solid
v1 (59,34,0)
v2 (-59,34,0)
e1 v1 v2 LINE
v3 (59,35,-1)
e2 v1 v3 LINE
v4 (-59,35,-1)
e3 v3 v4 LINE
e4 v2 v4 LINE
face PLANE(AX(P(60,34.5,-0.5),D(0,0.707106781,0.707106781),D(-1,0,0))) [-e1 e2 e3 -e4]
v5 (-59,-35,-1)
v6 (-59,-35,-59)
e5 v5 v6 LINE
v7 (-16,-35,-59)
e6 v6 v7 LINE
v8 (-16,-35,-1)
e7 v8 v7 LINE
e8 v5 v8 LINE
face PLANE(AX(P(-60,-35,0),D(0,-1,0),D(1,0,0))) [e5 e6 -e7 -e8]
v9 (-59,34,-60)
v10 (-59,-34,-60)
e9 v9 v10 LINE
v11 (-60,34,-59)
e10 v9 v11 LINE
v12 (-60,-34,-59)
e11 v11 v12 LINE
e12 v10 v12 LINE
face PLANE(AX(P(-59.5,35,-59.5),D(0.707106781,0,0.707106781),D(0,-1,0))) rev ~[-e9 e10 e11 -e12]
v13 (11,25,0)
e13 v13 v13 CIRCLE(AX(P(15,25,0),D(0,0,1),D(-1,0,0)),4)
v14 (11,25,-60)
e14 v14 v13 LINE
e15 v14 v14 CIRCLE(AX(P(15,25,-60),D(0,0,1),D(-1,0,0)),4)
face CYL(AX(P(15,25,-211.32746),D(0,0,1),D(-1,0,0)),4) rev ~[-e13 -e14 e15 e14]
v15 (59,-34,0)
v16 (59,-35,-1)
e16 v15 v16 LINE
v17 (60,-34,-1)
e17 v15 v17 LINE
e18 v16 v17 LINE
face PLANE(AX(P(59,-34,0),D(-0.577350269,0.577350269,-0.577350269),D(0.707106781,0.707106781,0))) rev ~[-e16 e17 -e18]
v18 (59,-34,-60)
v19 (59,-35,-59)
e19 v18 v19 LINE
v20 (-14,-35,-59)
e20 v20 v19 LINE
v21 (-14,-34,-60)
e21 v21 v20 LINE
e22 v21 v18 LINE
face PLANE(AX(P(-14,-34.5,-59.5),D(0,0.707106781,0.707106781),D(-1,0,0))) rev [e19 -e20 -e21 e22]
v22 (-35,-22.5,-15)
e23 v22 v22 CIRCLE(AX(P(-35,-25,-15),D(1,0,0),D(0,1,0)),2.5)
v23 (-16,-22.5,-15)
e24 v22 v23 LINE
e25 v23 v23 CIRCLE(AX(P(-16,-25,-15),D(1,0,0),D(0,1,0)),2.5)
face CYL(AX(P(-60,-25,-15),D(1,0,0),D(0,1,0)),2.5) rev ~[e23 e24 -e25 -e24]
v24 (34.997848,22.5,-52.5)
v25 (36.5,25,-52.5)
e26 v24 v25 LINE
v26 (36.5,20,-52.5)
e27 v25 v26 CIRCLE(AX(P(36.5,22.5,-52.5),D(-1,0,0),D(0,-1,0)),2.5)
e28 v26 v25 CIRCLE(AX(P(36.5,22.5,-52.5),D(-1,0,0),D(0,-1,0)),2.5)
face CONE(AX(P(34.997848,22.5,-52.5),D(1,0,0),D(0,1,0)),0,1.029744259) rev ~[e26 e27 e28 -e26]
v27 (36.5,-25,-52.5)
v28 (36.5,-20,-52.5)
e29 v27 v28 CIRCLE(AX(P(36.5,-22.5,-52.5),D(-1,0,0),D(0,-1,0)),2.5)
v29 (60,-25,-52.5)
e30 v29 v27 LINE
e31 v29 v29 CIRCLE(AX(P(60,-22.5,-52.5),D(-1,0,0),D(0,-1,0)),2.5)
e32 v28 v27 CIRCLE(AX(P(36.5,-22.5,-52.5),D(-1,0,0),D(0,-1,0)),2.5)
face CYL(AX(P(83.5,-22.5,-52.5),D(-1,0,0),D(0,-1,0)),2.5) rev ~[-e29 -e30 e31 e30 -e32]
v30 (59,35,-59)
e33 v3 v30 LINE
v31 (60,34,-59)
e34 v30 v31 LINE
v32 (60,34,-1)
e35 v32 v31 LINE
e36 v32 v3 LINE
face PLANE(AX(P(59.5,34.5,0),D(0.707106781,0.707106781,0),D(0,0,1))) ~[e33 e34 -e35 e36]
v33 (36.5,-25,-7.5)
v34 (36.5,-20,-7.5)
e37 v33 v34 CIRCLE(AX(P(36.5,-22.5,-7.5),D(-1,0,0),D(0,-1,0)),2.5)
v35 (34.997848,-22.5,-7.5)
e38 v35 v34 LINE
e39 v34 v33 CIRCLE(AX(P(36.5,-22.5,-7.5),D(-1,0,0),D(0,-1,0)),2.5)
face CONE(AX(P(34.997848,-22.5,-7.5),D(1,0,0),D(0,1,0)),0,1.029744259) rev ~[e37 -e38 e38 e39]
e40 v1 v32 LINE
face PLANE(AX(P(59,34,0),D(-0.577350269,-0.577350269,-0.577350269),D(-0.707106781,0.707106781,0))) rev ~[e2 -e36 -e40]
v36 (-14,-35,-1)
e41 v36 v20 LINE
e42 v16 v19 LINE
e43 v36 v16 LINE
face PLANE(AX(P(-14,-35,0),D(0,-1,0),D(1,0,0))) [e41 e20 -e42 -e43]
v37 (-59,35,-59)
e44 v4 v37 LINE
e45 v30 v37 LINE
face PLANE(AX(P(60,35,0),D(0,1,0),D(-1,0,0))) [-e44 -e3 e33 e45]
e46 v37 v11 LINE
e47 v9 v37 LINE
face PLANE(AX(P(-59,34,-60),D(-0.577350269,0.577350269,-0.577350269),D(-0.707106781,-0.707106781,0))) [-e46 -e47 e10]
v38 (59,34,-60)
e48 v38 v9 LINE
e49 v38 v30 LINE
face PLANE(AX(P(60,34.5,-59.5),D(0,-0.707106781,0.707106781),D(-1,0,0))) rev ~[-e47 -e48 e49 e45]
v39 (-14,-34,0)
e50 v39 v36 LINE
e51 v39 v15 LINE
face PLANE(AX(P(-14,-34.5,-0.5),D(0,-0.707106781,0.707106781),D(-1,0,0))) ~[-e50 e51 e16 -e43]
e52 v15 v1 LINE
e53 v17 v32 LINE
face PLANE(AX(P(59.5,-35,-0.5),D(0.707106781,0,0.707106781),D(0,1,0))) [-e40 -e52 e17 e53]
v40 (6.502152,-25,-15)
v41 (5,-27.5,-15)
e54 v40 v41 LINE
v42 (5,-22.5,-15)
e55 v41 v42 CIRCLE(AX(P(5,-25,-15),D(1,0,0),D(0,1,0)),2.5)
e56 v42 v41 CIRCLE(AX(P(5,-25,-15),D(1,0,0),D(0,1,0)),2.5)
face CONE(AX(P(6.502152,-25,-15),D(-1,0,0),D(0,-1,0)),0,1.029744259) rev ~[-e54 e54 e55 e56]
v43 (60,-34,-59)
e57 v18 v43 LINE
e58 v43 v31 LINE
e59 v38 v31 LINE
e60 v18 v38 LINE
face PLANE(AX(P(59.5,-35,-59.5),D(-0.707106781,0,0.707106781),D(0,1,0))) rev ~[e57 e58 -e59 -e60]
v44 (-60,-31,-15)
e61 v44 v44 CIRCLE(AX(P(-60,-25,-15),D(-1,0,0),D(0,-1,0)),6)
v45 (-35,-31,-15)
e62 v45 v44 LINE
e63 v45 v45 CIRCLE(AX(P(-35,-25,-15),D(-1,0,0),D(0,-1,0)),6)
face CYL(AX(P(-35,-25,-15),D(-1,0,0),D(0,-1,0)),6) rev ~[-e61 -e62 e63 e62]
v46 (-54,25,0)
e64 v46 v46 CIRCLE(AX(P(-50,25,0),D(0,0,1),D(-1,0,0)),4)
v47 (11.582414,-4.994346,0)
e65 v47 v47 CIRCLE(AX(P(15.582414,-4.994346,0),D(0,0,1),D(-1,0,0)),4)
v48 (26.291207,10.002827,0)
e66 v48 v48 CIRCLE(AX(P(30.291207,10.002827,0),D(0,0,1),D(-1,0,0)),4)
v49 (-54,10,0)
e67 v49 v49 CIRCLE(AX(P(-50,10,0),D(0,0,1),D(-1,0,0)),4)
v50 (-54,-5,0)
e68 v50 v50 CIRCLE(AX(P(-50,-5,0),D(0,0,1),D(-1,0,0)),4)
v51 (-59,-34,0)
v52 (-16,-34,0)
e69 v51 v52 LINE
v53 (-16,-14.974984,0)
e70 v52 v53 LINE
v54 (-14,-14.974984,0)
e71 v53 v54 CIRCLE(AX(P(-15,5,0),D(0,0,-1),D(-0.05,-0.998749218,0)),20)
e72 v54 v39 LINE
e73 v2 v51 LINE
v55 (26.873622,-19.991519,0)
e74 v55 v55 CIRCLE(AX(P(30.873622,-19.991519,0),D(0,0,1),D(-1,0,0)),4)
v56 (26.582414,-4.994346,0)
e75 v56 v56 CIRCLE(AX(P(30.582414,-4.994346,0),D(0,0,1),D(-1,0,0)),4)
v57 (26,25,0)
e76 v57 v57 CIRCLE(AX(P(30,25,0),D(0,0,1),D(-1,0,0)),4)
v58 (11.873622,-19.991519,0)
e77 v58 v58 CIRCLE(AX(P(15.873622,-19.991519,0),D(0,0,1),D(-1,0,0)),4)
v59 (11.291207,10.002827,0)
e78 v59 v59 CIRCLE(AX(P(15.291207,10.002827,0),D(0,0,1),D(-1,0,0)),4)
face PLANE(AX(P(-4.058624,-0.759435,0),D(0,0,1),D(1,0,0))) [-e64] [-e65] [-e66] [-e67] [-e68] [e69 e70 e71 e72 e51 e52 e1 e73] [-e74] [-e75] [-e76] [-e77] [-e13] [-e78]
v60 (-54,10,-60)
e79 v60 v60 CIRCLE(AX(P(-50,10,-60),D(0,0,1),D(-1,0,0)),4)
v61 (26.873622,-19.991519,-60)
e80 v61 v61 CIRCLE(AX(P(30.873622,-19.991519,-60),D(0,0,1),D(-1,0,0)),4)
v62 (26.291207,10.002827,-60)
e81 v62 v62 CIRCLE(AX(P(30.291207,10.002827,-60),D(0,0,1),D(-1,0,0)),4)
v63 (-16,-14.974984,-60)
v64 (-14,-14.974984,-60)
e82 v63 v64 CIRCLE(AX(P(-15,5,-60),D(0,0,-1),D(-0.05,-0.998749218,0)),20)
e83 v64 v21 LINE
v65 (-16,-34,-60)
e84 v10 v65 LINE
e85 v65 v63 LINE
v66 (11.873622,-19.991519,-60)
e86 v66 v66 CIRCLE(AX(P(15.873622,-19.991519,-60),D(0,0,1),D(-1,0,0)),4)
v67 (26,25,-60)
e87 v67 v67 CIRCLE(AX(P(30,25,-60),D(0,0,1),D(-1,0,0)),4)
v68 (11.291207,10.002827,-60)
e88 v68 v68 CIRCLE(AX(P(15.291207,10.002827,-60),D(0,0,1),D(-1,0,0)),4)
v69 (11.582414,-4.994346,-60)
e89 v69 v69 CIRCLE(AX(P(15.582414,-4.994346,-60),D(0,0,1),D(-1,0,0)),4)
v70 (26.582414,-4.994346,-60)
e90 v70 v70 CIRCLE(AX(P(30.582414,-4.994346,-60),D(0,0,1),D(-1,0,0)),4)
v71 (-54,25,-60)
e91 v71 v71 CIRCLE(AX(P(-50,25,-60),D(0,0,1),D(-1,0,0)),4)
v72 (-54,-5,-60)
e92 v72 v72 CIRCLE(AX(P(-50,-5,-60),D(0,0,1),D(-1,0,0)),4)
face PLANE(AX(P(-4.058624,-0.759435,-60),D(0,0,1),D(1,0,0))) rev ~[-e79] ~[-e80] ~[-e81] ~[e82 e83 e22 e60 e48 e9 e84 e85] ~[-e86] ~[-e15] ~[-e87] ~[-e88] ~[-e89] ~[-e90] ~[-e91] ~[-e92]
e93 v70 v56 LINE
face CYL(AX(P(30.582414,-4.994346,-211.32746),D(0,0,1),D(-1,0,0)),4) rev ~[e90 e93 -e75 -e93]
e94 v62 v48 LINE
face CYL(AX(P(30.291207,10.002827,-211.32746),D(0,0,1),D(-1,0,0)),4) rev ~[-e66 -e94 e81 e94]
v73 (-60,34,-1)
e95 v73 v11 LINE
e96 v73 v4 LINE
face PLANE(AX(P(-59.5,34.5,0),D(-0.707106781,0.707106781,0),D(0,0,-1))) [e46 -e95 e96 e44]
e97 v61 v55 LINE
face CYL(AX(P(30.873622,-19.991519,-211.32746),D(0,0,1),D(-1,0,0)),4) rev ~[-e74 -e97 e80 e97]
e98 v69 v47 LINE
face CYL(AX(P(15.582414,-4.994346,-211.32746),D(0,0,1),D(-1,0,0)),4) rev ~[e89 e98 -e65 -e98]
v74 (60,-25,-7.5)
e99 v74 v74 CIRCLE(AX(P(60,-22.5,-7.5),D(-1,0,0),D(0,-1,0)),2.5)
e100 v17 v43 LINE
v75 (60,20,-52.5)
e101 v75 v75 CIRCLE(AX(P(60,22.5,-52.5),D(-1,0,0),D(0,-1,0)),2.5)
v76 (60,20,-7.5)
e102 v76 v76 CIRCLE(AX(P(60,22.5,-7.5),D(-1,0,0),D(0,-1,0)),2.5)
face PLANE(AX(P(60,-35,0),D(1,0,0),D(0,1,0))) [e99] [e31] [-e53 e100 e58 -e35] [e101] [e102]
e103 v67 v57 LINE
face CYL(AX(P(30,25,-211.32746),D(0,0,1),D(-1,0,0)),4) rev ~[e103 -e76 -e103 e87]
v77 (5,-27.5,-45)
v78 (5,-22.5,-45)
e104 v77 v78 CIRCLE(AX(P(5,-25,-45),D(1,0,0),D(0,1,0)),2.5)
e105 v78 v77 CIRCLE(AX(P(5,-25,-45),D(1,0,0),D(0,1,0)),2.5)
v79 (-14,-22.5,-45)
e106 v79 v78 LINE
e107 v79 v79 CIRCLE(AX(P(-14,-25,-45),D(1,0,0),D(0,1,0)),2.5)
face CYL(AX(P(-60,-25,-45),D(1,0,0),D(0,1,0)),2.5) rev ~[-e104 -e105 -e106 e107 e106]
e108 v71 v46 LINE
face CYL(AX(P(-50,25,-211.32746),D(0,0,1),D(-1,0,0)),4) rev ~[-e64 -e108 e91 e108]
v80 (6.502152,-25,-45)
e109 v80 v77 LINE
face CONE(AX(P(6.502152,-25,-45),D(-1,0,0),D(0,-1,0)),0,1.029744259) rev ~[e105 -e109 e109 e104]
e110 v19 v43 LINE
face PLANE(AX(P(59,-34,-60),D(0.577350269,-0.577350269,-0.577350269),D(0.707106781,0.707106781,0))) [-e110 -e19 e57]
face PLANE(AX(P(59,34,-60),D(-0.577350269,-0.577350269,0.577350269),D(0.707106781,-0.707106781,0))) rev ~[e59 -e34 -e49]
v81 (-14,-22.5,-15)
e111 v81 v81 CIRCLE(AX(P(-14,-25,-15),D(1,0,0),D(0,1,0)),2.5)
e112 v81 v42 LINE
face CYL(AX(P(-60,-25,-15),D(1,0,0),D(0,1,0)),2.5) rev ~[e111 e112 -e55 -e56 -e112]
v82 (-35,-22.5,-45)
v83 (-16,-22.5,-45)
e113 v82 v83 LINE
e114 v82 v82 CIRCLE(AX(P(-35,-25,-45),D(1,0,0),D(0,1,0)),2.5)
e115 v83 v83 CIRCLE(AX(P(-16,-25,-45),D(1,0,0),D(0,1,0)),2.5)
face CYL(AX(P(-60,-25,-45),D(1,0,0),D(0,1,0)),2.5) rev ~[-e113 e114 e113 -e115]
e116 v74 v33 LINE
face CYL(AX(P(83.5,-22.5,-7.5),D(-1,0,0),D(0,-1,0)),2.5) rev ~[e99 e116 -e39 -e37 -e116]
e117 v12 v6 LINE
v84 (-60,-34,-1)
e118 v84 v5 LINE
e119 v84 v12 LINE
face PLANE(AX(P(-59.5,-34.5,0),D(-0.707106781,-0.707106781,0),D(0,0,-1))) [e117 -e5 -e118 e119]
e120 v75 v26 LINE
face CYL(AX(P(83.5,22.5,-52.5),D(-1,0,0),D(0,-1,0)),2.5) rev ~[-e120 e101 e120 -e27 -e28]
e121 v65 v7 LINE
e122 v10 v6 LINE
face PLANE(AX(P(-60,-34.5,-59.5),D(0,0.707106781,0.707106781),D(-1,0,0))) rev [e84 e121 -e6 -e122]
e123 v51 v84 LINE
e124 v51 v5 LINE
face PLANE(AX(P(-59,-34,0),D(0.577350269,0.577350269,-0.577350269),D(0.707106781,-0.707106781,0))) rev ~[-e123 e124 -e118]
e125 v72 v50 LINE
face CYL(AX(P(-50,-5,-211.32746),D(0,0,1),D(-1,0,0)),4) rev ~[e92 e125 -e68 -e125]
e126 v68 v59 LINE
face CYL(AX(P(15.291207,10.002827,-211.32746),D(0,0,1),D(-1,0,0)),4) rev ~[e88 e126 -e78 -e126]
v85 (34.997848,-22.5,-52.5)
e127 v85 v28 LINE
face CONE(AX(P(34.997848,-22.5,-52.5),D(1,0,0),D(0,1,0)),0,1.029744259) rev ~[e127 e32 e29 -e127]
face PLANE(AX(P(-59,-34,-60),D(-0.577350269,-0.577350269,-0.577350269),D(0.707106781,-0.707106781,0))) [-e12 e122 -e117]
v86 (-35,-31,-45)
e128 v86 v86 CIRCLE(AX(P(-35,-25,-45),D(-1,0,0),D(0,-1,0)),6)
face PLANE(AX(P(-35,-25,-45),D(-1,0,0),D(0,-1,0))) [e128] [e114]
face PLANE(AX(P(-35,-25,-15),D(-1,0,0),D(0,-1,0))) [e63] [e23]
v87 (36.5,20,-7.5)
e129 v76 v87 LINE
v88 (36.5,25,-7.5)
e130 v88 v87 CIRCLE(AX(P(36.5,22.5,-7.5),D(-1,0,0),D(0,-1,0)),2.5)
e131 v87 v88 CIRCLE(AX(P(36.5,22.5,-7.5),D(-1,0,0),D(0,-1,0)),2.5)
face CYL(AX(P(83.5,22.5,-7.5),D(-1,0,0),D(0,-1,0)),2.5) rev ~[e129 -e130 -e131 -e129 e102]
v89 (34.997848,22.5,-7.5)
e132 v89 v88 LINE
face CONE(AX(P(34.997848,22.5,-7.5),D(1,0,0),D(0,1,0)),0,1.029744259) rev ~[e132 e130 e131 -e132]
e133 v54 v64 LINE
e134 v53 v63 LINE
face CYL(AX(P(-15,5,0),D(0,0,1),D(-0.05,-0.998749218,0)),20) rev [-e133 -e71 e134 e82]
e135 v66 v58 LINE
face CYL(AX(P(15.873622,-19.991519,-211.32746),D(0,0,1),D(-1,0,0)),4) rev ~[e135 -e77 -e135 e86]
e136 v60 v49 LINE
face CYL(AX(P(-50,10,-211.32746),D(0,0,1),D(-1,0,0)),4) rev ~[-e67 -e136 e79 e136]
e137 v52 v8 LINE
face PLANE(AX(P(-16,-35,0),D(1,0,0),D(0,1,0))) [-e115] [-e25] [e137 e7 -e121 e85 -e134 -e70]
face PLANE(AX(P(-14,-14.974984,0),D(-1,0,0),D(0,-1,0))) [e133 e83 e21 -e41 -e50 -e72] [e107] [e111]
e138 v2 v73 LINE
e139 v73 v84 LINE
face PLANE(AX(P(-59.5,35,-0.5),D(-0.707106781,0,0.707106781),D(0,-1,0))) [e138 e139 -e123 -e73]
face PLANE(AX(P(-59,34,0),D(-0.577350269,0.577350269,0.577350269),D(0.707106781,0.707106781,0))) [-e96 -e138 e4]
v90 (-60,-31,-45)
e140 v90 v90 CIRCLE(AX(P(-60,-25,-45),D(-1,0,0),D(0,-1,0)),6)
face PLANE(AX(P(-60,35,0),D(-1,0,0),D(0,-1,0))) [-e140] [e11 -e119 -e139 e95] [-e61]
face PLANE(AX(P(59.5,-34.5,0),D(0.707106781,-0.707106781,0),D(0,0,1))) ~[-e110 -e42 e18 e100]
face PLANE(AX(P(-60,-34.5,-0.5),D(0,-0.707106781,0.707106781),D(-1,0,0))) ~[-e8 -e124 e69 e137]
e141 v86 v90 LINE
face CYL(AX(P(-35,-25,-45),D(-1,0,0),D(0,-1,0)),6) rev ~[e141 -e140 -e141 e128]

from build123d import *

# Parameters (mm, degrees)
F1_DEPTH       = 60
F3_D           = 5
F3_DEPTH       = 65
F3_CBORE_D     = 12
F3_CBORE_DEPTH = 25
F3_TIP         = 1.5021515476
F4_SIZE        = 1
F6_D           = 5
F6_DEPTH       = 23.5
F6_TIP         = 1.5021515476
F9_D           = 8
F9_ON_F7_D     = 8


with BuildPart() as f1:
    # F0 (on Top) → F1 (new body)
    with BuildSketch(Plane.XY):
        with BuildLine():
            Line((60, 35), (-60, 35))
            Line((-60, 35), (-60, -35))
            Line((-60, -35), (-16, -35))
            Line((-16, -35), (-16, -14.9749843554))
            ThreePointArc((-16, -14.9749843554), (-15, 25), (-14, -14.9749843554))
            Line((-14, -14.9749843554), (-14, -35))
            Line((-14, -35), (60, -35))
            Line((60, -35), (60, 35))
        make_face()
    extrude(amount=-F1_DEPTH)

    # F3
    with Locations(Plane(origin=(-60, 0, 0), x_dir=(0, -1, 0), z_dir=(-1, 0, 0))):
        with Locations((25, -45), (25, -15)):
            CounterBoreHole(F3_D / 2, F3_CBORE_D / 2, F3_CBORE_DEPTH, depth=F3_DEPTH)
            with Locations((0, 0, -(F3_DEPTH + F3_TIP / 2))):  # 118° drill point
                Cone(0, F3_D / 2, F3_TIP, mode=Mode.SUBTRACT)

    # F4
    f4_edges = [f1.edges().sort_by_distance(p)[0] for p in [
        (-60, -35, -30),
        (-60, 35, -30),
        (60, -35, -30),
        (60, 35, -30),
        (0, 35, -60),
        (-60, 0, -60),
        (-38, -35, -60),
        (23, -35, -60),
        (60, 0, -60),
        (-60, 0, 0),
        (-38, -35, 0),
        (23, -35, 0),
        (60, 0, 0),
        (0, 35, 0),
    ]]
    chamfer(f4_edges, length=F4_SIZE)

    # F6
    with Locations(Plane.YZ.offset(60)):
        with Locations((-22.5, -7.5), (22.5, -7.5), (22.5, -52.5), (-22.5, -52.5)):
            Hole(F6_D / 2, depth=F6_DEPTH)
            with Locations((0, 0, -(F6_DEPTH + F6_TIP / 2))):  # 118° drill point
                Cone(0, F6_D / 2, F6_TIP, mode=Mode.SUBTRACT)

    # F9 (through all)
    with Locations(Plane(origin=(0, 0, -60), x_dir=(1, 0, 0), z_dir=(0, 0, -1))):
        with Locations((15, -25), (15.2912072429, -10.0028269883), (15.5824144859, 4.9943460233), (15.8736217288, 19.991519035), (30.8736217288, 19.991519035), (30.5824144859, 4.9943460233), (30.2912072429, -10.0028269883), (30, -25)):
            Hole(F9_D / 2)

    # F9 on F7 (through all)
    with Locations(Plane(origin=(0, 0, -60), x_dir=(1, 0, 0), z_dir=(0, 0, -1))):
        with Locations((-50, -25), (-50, -10), (-50, 5)):
            Hole(F9_ON_F7_D / 2)


solid = f1.part
